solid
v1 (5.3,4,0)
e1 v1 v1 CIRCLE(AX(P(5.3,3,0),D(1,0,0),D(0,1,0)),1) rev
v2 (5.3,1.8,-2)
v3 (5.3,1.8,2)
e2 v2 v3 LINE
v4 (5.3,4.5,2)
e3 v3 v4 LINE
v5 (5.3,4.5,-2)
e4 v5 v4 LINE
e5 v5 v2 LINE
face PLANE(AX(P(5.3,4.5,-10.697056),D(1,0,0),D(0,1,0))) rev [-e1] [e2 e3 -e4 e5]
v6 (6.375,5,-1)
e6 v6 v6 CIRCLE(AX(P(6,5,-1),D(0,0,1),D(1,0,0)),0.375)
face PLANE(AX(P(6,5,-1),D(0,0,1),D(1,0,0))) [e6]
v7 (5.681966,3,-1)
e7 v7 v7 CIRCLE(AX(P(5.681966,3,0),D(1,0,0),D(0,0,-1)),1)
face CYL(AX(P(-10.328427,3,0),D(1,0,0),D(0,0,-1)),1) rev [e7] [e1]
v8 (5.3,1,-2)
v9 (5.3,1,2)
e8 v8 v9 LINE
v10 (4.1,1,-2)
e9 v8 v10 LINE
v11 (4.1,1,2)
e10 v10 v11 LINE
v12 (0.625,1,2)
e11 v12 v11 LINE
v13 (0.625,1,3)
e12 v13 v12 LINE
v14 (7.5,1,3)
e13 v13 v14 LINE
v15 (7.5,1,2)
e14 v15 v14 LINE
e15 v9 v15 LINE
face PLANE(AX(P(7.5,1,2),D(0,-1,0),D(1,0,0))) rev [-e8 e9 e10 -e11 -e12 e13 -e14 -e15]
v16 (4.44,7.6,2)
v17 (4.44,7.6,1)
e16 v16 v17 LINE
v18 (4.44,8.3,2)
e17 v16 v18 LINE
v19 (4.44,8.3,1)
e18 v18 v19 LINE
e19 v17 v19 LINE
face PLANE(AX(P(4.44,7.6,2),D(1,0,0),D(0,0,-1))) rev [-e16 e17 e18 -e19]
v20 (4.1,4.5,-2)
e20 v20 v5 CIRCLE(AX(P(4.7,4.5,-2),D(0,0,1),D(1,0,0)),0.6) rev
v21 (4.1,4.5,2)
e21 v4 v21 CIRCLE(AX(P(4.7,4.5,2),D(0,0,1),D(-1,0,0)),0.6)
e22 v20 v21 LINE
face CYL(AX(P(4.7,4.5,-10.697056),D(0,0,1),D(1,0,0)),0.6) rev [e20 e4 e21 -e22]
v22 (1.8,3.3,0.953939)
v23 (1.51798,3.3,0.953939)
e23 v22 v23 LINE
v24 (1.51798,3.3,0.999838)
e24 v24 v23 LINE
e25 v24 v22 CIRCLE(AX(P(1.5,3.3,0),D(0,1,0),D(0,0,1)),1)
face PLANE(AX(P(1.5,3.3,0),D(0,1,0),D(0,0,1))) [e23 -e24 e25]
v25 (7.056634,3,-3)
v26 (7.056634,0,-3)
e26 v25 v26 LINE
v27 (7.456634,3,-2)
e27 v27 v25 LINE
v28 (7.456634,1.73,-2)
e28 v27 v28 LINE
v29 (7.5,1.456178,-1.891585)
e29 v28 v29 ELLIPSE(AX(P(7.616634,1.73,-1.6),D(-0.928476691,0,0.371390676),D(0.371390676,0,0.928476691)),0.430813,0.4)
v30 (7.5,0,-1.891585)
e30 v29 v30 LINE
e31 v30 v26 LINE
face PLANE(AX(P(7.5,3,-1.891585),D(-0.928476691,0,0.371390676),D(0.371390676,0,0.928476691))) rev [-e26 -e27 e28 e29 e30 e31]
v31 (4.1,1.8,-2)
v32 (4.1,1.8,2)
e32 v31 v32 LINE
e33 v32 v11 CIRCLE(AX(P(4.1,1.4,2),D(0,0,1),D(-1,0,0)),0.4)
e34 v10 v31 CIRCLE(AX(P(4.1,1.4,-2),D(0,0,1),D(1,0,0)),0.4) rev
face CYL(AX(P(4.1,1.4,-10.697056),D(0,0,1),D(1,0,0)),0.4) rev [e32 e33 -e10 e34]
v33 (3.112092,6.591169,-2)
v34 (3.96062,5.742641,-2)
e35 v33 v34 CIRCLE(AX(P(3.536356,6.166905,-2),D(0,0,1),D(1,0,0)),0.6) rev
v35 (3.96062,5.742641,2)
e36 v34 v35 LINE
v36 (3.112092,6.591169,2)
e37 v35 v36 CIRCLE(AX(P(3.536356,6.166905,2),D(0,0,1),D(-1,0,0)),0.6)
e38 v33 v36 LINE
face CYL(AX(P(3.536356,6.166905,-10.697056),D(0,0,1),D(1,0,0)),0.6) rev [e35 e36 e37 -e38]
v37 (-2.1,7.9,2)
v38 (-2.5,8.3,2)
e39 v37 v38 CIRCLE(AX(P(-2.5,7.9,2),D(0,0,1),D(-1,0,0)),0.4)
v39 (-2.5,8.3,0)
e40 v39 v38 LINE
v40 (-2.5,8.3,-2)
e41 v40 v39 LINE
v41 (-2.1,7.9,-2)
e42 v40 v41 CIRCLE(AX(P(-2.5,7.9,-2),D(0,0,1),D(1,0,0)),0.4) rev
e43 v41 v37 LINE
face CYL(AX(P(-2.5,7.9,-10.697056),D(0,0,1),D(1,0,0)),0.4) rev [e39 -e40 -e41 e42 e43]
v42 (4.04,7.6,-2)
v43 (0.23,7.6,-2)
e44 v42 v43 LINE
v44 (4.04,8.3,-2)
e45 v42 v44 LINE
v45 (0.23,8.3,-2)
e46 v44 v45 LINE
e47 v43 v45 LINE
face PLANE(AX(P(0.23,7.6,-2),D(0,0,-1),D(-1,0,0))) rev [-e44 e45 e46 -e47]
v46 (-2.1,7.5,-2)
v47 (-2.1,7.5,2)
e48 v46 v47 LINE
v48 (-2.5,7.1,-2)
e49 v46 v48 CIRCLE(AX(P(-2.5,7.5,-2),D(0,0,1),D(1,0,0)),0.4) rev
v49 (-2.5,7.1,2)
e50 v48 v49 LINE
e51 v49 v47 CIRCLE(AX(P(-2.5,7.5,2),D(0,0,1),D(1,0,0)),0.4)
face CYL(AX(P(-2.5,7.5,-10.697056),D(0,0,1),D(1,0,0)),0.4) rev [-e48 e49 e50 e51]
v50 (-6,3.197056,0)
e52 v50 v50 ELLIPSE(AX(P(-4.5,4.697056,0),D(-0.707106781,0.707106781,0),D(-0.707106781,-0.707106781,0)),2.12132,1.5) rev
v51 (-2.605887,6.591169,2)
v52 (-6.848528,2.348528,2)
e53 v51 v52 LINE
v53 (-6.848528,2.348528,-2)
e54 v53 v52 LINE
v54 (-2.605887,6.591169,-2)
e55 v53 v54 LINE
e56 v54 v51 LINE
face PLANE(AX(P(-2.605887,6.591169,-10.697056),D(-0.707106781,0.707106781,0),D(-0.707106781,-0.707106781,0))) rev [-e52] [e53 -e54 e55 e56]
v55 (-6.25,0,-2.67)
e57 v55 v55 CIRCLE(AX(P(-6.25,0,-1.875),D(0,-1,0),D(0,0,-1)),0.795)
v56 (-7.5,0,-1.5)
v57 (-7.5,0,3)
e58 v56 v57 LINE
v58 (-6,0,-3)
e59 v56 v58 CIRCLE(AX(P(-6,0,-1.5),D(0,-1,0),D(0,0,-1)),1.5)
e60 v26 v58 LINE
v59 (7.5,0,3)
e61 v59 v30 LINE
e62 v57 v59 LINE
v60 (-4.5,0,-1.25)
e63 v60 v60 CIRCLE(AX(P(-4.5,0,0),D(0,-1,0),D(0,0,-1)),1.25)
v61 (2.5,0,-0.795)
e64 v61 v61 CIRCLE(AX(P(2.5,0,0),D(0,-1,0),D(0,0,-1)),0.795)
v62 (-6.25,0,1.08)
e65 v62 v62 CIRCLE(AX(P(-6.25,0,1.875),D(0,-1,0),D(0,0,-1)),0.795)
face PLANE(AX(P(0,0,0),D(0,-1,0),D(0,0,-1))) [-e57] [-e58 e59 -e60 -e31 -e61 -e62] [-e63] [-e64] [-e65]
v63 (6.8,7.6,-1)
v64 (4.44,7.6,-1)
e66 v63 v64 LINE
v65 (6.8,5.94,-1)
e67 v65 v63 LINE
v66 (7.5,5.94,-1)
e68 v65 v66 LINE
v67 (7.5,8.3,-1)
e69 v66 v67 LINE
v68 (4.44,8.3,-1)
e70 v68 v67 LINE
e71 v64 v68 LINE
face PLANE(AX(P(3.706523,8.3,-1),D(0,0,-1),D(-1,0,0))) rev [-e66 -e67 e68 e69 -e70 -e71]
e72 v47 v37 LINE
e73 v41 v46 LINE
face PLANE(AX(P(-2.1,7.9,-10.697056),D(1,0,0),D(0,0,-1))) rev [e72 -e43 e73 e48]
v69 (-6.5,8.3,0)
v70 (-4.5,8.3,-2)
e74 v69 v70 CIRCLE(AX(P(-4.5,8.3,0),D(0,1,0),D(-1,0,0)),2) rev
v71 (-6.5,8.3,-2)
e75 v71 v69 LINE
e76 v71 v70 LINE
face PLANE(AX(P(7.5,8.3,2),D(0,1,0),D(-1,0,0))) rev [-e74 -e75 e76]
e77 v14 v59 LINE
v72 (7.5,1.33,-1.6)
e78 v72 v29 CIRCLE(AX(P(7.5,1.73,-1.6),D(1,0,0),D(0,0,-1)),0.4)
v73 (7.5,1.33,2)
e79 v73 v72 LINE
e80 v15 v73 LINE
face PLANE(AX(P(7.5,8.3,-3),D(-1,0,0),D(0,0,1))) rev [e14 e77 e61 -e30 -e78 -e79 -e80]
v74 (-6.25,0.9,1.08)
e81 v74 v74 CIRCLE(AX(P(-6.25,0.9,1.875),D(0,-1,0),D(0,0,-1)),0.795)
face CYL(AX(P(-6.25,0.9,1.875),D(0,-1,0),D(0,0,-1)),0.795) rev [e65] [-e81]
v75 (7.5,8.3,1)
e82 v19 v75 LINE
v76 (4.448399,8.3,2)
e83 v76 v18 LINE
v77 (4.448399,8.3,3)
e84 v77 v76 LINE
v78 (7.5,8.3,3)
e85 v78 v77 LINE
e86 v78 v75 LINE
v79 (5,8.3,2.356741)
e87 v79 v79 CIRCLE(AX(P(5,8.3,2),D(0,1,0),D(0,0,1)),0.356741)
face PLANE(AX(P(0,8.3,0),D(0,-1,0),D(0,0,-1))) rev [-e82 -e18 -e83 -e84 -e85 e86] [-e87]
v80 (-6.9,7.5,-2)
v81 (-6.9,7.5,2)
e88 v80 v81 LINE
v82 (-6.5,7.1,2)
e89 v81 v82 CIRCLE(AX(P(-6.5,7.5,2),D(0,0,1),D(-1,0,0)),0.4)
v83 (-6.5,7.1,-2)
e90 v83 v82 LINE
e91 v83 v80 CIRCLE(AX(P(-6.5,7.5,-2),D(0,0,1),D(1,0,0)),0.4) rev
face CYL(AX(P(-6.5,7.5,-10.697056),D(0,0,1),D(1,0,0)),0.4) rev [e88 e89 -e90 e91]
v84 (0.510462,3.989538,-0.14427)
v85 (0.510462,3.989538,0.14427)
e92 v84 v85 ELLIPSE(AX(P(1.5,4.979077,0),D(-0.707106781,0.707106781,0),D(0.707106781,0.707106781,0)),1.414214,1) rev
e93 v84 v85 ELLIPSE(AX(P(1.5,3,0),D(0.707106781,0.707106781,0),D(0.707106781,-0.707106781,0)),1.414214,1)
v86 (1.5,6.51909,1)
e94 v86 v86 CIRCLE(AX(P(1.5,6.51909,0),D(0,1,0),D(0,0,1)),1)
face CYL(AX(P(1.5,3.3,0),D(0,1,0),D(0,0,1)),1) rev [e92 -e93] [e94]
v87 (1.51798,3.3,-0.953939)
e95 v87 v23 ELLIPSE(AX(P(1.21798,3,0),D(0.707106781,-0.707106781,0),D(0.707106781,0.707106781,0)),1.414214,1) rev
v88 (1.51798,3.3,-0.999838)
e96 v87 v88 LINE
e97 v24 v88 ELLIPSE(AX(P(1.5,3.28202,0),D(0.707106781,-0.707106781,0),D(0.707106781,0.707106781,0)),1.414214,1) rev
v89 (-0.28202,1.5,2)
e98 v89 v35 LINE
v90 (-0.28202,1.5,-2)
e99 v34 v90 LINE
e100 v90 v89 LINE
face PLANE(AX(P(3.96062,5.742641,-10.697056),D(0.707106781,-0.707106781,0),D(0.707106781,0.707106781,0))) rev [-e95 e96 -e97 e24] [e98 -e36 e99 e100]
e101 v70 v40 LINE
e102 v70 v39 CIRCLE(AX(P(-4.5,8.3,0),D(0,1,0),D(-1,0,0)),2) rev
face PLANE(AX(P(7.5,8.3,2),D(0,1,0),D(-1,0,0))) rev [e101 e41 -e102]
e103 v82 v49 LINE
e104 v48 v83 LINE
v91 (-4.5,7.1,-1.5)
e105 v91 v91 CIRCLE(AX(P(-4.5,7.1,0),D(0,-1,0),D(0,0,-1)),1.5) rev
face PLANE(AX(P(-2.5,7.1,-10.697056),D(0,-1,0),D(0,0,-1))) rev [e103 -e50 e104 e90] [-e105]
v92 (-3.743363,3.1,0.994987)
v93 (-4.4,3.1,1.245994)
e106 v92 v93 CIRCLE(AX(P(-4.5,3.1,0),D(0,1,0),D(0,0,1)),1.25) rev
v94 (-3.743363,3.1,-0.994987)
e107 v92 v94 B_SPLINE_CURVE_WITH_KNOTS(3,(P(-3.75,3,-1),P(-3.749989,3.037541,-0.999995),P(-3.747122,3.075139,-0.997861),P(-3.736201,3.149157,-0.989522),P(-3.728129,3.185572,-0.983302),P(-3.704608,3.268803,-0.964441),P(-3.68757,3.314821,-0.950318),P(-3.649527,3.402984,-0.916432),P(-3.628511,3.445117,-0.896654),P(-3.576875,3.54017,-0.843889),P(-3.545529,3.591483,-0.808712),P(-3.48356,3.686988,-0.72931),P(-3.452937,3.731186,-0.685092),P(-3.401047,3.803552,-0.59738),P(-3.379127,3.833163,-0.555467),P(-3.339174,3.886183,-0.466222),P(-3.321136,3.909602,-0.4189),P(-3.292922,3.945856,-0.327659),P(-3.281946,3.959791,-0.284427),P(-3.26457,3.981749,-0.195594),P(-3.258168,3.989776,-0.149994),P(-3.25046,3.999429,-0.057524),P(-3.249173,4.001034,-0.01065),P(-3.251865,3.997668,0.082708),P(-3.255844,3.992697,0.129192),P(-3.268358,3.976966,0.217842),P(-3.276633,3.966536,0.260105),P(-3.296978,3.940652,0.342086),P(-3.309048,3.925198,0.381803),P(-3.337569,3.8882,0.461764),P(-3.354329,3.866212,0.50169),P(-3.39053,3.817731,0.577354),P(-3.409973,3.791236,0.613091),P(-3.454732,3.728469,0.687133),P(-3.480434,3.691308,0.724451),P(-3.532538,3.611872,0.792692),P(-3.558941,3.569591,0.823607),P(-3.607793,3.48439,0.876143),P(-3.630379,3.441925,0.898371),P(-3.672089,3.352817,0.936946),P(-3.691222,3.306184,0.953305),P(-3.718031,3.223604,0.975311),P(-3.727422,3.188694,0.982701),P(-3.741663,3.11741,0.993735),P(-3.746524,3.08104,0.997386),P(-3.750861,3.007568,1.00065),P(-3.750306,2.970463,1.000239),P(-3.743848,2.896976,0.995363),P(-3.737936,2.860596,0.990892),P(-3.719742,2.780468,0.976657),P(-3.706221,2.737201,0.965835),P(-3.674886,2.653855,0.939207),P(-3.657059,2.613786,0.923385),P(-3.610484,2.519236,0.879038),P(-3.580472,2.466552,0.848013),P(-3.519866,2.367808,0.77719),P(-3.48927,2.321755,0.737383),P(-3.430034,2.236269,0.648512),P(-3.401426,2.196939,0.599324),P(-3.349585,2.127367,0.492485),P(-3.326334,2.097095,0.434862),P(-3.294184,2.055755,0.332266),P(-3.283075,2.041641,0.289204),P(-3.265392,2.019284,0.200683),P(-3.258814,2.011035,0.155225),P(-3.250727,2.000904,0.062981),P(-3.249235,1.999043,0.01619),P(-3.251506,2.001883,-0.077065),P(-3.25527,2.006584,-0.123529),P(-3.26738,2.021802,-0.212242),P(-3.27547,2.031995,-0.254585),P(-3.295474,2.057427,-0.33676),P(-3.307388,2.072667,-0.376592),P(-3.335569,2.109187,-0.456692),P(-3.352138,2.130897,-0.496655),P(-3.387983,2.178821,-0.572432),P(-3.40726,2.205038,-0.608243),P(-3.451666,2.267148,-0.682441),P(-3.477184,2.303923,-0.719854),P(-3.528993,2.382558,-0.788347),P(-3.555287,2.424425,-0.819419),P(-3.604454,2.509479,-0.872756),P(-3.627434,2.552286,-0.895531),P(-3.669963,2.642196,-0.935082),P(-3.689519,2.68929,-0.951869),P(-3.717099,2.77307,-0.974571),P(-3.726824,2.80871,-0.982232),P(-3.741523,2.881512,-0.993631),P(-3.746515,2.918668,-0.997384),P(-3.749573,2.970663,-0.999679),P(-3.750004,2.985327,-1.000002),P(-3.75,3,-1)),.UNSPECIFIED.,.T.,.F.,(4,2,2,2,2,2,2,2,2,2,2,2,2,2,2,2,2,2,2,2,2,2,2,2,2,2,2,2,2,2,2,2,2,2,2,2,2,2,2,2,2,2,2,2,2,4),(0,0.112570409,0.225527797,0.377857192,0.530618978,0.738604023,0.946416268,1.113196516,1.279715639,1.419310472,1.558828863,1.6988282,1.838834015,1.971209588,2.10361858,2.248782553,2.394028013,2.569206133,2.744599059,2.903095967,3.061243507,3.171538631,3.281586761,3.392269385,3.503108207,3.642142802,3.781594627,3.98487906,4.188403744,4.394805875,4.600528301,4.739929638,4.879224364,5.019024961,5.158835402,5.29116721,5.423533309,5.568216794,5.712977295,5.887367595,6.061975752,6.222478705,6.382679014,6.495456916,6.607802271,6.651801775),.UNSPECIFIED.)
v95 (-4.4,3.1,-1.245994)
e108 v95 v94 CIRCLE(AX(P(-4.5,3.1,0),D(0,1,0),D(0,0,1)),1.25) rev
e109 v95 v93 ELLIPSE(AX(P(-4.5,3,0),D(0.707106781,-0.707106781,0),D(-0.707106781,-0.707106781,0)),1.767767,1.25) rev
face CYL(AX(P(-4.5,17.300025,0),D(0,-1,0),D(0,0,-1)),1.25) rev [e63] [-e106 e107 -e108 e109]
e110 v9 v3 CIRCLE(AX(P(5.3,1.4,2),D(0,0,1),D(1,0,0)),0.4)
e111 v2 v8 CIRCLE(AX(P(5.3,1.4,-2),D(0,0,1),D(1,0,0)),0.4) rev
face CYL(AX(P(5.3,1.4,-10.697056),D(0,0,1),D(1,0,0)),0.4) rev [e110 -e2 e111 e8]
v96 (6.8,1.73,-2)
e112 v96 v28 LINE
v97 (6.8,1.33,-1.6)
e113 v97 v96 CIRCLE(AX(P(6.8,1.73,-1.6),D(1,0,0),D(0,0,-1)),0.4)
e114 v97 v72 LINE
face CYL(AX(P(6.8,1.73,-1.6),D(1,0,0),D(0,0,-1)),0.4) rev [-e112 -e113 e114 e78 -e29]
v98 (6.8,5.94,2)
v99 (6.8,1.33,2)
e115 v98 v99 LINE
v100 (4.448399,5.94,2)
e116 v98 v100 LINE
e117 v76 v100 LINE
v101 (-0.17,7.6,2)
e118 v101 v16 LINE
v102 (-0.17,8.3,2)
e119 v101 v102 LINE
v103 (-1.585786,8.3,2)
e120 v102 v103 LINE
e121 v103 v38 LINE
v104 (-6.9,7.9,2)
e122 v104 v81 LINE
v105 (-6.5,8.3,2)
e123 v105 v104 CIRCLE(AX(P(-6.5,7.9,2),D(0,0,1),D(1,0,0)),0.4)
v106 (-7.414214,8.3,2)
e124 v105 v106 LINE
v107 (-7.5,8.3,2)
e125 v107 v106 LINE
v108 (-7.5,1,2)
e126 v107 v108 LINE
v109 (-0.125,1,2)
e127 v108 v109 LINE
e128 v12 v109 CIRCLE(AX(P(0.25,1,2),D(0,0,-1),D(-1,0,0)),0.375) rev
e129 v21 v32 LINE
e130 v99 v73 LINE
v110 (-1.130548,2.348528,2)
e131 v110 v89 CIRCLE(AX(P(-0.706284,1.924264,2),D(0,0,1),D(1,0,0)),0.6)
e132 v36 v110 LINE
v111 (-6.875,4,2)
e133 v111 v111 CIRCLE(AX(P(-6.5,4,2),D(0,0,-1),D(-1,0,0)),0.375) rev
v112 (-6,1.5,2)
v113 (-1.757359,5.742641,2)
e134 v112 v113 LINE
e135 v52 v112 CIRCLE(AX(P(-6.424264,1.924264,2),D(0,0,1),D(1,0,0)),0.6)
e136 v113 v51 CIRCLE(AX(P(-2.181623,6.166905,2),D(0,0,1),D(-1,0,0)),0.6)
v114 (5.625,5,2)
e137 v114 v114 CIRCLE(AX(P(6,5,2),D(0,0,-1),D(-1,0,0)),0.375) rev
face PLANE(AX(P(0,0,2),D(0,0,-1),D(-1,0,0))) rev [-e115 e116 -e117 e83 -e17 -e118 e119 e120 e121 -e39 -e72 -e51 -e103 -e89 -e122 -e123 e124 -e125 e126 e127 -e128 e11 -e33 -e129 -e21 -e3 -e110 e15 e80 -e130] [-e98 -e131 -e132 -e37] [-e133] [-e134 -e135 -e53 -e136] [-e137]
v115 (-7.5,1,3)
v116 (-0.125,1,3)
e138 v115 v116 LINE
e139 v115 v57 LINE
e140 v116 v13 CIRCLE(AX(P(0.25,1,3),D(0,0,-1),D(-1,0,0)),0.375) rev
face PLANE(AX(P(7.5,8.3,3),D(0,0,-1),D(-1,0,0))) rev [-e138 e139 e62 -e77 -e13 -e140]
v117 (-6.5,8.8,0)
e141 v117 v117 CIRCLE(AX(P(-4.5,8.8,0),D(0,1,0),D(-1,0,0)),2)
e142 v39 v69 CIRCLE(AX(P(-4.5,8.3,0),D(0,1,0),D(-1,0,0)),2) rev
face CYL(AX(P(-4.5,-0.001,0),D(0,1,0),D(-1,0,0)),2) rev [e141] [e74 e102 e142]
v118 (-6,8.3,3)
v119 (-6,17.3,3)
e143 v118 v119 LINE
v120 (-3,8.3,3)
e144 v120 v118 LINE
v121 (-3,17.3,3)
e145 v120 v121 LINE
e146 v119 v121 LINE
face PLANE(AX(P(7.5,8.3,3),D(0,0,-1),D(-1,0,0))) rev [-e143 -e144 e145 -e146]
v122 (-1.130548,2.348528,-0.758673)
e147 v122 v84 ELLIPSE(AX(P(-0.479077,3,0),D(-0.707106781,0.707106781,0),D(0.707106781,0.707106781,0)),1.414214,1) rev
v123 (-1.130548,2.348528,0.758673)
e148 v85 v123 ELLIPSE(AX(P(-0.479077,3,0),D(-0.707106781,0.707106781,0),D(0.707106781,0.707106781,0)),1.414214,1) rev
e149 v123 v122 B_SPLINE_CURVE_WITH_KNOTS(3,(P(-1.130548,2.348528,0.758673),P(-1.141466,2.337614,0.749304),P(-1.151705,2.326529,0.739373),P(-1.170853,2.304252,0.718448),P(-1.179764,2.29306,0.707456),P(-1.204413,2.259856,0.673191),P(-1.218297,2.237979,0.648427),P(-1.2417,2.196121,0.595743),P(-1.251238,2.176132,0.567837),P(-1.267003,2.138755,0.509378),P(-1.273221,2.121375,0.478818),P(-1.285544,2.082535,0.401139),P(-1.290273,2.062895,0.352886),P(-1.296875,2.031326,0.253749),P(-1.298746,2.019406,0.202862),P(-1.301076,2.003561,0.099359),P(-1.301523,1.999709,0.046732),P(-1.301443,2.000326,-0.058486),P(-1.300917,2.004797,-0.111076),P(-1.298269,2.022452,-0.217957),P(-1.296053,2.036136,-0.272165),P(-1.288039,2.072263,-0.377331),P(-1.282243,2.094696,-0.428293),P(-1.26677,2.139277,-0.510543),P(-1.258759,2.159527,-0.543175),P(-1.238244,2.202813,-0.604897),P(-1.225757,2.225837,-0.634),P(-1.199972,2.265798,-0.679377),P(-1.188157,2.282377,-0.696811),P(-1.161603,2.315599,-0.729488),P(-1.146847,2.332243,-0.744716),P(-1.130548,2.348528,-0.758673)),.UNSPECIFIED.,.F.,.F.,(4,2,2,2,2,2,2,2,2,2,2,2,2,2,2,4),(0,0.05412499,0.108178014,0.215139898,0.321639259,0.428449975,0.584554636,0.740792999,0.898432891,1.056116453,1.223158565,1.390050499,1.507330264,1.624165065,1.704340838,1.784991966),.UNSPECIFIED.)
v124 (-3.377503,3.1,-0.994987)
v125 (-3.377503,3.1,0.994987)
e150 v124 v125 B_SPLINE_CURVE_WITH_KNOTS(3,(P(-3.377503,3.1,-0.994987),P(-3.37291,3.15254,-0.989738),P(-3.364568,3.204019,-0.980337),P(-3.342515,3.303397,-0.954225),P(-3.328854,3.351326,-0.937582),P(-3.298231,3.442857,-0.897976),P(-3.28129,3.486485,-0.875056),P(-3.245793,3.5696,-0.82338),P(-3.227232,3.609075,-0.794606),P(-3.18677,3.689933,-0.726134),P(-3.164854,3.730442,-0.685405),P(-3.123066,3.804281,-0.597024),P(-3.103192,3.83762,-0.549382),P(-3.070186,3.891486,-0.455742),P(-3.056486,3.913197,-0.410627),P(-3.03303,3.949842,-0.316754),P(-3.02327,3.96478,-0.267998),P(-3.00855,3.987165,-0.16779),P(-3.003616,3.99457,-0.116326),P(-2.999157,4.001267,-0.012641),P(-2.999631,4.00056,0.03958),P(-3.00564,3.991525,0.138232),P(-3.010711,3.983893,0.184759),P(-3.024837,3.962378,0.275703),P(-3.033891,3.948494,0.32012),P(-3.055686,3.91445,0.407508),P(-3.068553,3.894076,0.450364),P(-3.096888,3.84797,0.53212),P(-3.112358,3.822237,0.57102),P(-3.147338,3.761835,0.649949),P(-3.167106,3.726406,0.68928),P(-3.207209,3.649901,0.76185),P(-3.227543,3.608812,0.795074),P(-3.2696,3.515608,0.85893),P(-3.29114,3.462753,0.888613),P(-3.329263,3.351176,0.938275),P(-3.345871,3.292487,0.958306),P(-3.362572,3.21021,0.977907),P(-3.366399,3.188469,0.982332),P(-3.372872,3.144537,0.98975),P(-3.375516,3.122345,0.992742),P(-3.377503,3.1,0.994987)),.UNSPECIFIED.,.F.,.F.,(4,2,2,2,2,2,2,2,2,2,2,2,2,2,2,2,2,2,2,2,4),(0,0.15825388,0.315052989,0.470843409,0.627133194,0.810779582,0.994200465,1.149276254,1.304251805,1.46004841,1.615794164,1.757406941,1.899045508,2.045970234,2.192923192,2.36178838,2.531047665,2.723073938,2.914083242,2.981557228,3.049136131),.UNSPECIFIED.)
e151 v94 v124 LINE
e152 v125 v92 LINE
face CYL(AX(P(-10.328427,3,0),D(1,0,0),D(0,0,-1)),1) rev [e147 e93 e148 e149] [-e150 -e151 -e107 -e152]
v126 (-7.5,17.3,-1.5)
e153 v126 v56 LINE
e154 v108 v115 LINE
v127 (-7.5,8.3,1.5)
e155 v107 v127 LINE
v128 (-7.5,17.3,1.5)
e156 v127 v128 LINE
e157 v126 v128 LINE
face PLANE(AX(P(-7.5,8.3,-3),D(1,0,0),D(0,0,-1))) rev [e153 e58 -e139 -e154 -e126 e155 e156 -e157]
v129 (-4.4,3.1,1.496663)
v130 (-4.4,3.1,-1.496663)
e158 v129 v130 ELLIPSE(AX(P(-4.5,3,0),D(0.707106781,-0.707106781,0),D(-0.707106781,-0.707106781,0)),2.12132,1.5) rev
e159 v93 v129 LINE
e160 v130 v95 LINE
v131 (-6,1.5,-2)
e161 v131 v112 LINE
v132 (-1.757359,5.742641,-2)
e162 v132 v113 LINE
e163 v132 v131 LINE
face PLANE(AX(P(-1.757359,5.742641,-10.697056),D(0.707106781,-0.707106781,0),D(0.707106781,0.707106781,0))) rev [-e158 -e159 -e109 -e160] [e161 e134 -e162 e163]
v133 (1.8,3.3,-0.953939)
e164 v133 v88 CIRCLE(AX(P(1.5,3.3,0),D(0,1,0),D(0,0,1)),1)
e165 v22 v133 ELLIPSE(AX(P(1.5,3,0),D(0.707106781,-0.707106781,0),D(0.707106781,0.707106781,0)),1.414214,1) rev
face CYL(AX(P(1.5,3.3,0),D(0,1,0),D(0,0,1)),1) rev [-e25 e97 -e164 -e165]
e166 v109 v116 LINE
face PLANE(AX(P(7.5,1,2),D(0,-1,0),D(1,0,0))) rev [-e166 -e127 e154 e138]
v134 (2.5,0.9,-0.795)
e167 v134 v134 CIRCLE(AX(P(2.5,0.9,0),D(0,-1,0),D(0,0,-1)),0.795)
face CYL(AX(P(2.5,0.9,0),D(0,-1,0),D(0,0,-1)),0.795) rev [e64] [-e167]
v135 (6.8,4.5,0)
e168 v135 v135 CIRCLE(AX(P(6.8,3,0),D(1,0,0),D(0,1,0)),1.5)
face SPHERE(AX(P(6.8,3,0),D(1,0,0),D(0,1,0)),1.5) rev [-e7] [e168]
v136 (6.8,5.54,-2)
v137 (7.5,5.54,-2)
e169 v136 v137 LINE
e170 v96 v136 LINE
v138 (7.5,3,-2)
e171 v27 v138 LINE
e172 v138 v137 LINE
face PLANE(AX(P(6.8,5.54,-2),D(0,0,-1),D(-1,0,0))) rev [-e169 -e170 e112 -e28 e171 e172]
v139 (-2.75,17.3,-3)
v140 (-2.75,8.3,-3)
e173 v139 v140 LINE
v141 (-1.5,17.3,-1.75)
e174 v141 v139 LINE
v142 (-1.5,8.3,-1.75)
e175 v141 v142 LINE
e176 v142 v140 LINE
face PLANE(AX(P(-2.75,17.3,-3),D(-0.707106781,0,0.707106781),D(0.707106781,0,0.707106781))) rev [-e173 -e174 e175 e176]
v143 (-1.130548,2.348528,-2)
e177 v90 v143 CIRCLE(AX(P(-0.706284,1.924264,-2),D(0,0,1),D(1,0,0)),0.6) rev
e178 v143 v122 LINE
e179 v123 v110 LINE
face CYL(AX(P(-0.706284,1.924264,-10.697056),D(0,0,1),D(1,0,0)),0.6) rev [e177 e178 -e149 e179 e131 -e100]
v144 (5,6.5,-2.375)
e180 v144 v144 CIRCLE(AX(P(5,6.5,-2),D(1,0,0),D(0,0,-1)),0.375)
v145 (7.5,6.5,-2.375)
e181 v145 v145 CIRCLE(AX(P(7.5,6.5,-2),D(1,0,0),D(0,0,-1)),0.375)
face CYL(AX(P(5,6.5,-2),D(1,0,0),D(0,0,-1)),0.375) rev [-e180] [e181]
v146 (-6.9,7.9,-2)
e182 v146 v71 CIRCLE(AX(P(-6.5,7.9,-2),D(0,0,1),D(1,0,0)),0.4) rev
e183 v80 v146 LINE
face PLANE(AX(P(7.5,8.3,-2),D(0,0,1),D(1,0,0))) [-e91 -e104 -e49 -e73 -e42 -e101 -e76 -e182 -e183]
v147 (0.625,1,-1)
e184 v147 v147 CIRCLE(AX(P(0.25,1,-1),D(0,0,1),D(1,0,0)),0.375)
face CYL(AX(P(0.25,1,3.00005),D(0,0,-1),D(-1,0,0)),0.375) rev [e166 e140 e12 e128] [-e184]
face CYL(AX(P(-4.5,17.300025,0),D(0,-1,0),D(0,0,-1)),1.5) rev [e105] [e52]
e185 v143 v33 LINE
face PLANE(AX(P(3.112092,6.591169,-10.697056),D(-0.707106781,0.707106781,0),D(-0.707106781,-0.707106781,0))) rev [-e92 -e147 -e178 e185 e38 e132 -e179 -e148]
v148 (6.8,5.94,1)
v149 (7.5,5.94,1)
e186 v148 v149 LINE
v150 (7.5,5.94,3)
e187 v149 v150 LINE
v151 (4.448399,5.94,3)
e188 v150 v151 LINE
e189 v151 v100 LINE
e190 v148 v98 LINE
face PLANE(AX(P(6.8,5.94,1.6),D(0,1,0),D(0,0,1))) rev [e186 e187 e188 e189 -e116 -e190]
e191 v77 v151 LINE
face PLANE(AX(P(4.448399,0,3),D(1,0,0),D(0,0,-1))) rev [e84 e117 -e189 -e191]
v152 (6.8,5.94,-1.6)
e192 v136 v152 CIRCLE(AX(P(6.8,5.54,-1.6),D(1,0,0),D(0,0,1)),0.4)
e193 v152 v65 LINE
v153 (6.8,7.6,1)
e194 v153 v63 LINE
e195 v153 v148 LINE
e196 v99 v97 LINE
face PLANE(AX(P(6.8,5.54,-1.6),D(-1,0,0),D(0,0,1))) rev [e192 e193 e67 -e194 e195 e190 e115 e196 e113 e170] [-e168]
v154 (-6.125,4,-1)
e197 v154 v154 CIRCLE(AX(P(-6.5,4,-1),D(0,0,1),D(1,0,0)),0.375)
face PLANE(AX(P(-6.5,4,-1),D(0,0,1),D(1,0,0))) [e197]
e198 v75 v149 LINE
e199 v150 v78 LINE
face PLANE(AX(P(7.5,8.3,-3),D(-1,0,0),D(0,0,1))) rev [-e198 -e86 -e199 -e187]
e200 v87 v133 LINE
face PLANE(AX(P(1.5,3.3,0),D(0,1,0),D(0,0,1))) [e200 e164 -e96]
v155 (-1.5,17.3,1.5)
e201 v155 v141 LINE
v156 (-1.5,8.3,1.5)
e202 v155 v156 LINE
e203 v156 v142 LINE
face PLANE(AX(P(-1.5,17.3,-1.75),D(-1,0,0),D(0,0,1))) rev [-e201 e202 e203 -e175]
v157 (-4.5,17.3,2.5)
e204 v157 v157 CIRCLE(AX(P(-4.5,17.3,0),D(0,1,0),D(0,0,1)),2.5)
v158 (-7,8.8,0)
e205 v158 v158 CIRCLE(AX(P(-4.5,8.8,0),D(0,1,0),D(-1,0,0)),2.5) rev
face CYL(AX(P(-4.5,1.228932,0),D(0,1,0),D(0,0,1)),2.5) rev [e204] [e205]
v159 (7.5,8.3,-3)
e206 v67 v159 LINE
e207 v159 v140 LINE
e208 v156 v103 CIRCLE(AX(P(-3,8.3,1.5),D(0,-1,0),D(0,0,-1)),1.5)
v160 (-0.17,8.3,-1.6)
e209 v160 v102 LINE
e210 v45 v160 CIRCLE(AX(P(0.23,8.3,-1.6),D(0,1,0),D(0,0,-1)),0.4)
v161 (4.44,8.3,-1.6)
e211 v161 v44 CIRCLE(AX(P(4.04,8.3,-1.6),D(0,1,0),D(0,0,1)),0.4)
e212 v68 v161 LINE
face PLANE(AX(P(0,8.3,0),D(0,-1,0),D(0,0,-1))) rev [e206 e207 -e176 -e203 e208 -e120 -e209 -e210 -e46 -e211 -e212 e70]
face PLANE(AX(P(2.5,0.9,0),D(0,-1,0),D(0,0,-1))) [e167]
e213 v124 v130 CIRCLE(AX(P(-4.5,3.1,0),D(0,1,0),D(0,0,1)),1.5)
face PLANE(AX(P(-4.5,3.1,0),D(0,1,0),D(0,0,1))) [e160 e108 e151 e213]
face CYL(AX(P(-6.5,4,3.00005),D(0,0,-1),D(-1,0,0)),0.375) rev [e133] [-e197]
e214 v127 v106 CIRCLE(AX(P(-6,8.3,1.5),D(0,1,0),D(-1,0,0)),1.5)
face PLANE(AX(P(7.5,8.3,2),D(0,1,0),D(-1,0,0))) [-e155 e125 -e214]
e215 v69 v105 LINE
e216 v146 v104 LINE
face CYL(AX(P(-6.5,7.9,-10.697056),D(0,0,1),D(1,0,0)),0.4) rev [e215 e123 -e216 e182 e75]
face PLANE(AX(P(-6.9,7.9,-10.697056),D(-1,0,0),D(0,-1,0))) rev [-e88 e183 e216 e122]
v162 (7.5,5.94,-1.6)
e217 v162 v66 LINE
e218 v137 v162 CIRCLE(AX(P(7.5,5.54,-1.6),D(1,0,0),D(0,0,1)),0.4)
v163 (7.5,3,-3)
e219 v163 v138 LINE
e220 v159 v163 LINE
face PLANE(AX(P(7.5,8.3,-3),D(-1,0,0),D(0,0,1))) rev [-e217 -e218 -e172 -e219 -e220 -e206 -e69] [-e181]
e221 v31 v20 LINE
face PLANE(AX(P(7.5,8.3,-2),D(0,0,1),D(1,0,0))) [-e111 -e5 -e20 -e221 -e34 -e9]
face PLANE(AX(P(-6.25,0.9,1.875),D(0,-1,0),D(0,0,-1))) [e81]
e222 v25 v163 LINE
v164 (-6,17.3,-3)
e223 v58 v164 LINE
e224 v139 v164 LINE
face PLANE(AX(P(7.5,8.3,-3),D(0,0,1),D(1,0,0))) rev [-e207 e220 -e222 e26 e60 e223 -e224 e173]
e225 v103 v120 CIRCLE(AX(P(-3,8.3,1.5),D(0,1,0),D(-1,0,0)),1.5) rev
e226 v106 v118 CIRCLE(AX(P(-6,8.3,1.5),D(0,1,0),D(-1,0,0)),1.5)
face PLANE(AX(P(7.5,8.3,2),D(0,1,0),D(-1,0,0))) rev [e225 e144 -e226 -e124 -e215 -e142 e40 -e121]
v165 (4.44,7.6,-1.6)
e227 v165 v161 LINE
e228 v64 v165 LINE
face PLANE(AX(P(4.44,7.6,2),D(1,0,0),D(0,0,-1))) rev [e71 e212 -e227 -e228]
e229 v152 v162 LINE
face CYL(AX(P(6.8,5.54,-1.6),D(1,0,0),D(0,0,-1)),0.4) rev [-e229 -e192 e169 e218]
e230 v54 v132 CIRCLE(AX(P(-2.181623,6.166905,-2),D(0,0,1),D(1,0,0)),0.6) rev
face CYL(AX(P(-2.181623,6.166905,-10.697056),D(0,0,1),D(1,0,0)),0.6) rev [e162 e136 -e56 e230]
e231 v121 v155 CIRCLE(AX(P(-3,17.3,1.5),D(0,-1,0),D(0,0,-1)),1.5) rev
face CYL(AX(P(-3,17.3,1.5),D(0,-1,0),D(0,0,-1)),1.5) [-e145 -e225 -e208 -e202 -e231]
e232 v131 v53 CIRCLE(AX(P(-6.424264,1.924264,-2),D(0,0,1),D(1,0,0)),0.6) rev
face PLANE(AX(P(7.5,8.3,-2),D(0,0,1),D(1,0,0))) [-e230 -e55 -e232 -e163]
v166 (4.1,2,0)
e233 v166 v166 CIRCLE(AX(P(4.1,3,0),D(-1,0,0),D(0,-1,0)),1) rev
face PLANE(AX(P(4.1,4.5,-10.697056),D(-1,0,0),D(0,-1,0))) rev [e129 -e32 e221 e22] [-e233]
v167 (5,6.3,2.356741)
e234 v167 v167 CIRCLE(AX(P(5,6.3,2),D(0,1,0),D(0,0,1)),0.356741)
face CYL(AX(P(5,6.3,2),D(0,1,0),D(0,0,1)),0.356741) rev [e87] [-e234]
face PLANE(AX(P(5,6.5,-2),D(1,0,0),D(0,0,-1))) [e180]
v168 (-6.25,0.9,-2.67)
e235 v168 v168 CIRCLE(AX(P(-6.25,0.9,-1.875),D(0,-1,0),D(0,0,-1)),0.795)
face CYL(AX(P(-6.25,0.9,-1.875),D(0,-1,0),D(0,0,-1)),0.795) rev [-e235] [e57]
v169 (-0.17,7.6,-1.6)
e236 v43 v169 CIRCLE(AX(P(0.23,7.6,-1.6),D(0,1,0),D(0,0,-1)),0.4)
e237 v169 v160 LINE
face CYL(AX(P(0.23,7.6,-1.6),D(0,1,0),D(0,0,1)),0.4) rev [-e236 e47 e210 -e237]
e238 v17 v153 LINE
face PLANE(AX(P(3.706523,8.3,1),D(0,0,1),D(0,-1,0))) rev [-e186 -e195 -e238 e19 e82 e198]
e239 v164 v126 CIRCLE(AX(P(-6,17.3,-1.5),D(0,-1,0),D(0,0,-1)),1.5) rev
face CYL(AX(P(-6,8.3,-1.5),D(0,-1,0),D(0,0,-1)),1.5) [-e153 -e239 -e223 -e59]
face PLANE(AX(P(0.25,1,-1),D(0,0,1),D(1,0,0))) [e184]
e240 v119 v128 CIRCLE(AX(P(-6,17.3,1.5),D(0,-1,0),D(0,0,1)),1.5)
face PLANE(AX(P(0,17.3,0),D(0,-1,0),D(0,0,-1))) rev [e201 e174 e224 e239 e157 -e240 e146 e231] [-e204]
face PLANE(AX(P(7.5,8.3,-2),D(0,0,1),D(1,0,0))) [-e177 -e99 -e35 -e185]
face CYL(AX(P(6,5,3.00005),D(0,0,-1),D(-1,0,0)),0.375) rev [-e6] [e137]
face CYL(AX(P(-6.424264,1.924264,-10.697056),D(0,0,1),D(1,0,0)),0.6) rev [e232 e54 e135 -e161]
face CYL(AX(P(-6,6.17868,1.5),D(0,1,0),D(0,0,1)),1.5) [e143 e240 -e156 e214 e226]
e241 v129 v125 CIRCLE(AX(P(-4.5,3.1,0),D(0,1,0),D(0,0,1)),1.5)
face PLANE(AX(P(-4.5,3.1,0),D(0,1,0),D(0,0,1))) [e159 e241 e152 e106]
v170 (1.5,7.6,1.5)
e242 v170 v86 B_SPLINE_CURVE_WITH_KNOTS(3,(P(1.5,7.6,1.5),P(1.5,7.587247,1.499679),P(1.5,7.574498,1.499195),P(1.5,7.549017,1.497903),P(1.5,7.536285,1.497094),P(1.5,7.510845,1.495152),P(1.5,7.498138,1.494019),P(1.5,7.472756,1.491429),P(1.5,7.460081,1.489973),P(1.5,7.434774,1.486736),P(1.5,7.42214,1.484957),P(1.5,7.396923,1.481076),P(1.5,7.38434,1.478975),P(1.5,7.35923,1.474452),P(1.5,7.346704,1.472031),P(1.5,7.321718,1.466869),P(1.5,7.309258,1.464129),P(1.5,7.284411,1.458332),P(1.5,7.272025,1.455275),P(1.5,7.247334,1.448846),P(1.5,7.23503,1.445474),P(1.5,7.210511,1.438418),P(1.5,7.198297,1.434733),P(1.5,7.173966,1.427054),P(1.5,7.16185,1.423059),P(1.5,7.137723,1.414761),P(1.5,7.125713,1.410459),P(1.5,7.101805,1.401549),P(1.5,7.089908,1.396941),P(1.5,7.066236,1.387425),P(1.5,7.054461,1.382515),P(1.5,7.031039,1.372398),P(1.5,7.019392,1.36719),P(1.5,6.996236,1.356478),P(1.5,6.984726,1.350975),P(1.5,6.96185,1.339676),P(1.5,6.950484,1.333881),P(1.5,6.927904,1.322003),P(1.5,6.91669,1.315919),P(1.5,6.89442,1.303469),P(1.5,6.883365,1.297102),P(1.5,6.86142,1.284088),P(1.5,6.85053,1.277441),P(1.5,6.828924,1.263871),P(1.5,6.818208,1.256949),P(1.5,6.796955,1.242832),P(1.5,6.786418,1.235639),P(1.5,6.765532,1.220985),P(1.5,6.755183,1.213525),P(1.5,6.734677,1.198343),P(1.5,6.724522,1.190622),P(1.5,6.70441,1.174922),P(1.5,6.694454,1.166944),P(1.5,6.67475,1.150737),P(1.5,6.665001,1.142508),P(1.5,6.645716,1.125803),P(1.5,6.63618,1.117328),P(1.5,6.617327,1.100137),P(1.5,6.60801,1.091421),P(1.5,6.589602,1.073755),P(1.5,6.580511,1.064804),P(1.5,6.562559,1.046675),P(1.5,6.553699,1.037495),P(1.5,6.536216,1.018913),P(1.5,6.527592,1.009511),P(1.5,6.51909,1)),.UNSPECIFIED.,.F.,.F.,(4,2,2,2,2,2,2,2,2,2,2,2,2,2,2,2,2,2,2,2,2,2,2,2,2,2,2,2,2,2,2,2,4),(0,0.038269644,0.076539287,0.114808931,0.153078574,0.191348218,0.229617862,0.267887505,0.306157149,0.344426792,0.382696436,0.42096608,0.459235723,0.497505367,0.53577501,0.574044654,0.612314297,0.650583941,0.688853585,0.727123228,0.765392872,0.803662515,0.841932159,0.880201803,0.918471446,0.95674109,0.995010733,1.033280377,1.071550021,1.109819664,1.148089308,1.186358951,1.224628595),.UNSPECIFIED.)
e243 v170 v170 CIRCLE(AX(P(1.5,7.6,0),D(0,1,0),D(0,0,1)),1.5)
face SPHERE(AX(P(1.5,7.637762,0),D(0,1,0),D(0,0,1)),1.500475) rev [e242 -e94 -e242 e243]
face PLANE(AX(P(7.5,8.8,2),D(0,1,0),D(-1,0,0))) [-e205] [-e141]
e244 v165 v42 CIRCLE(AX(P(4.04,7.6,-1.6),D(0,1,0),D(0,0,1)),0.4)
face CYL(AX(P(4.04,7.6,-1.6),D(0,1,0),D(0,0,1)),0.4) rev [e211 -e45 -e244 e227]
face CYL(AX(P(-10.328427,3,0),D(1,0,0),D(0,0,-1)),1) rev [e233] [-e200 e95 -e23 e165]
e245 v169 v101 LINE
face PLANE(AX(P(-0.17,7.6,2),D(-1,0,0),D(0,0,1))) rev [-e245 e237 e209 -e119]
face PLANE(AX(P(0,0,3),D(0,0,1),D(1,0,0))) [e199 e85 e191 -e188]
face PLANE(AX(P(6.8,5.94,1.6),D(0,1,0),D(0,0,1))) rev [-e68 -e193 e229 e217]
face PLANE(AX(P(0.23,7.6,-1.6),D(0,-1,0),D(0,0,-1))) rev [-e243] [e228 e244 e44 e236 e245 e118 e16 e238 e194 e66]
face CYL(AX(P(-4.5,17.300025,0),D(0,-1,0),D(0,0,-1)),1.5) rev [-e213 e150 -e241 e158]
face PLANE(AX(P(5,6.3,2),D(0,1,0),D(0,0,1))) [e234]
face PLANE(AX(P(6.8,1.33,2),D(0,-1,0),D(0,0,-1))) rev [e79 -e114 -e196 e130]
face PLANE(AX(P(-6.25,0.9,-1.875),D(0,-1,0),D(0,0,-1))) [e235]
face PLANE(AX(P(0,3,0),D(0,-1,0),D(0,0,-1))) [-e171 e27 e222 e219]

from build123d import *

# Parameters (mm, degrees)
SKETCH1_W                        = 15
SKETCH1_H                        = 6
MAIN_BODY_EXT_DEPTH              = 8.3
EMISSION_PATH_EXT_DEPTH          = 9
SKETCH3_R                        = 1.25
EMISSION_AND_GRIN_CUT_DEPTH      = 20.092931
SKETCH4_R                        = 1
DRUM_LENS_CUT_DEPTH              = 13
SKETCH41_R                       = 1
ADDTL_LIGHT_SOURCE_DEPTH         = 5
SKETCH5_W                        = 15
SKETCH5_H                        = 7.3
FILTERSET_CUT1_DEPTH             = 1
FILTERSET_CUT2_DEPTH             = 4
SKETCH10_R                       = 2.5
EMISSION_LENS_CUT_DEPTH          = 8.5
SKETCH15_R                       = 0.795
MAGNETS_CUT_DEPTH                = 0.9
SCREW_HOLES_CUT_DEPTH            = 20.507434
SCREW_HOLES_CUT_DEPTH_BACK       = 3
SKETCH18_R                       = 0.375
EXTERNAL_FILLET_1_R              = 1.5
CUT_EXTRUDE8_DEPTH               = 14.011149
CUT_EXTRUDE8_DEPTH_BACK          = 4
SKETCH28_R                       = 1.5
CUT_EXTRUDE9_DEPTH               = 3
CUT_EXTRUDE_ORIGINAL_LIGHT_DEPTH = 0.7
CUT_EXTRUDE_ADDTL_LIGHT_DEPTH    = 0.7
SKETCH29_R                       = 0.375
CUT_EXTRUDE11_DEPTH              = 2.5
SKETCH32_W                       = 2
SKETCH32_H                       = 2.36
CUT_EXTRUDE14_DEPTH              = 0.7
SKETCH45_W                       = 2.36
SKETCH45_H                       = 2
CUT_EXTRUDE19_DEPTH              = 0.7
CUT_EXTRUDE16_DEPTH              = 9
CUT_EXTRUDE17_REACH              = 13.945
SKETCH37_R                       = 2
BOSS_EXTRUDE2_DEPTH              = 1
SKETCH51_R                       = 0.356741
ADD_L_SCREW_HOLE_DEPTH           = 2


with BuildPart() as part:
    # Sketch1 → Main Body Ext (new body)
    with BuildSketch(Plane(origin=(0, 0, 0), x_dir=(1, 0, 0), z_dir=(0, 1, 0))):
        Rectangle(SKETCH1_W, SKETCH1_H)
    extrude(amount=MAIN_BODY_EXT_DEPTH)

    # Sketch8 → Emission Path Ext (add)
    with BuildSketch(Plane(origin=(0, 8.3, 0), x_dir=(1, 0, 0), z_dir=(0, 1, 0))):
        Polygon((-2.75, 3), (-1.5, 1.75), (-1.5, -3), (-7.5, -3), (-7.5, 3), align=None)
    extrude(amount=EMISSION_PATH_EXT_DEPTH)

    # Sketch3 → Emission and Grin Cut (cut, through all)
    with BuildSketch(Plane.XZ):
        with Locations(Location((-4.5, 0, 0), (0, 0, 270))):
            Circle(SKETCH3_R)
    extrude(amount=-EMISSION_AND_GRIN_CUT_DEPTH, mode=Mode.SUBTRACT)

    # Sketch4 → Drum Lens Cut (cut)
    with BuildSketch(Plane(origin=(7.5, 0, 0), x_dir=(0, 0, -1), z_dir=(1, 0, 0))):
        with Locations((0, 3)):
            Circle(SKETCH4_R)
    extrude(amount=-DRUM_LENS_CUT_DEPTH, mode=Mode.SUBTRACT)

    # Sketch41 → Addtl Light Source (cut)
    with BuildSketch(Plane(origin=(0, 8.3, 0), x_dir=(1, 0, 0), z_dir=(0, 1, 0))):
        with Locations(Location((1.5, 0, 0), (0, 0, 270))):
            Circle(SKETCH41_R)
    extrude(amount=-ADDTL_LIGHT_SOURCE_DEPTH, mode=Mode.SUBTRACT)

    # Sketch5 → FilterSet Cut1 (cut)
    with BuildSketch(Plane.XY.offset(3)):
        with Locations((0, 4.65)):
            Rectangle(SKETCH5_W, SKETCH5_H)
    extrude(amount=-FILTERSET_CUT1_DEPTH, mode=Mode.SUBTRACT)

    # Sketch6 → FilterSet Cut2 (cut)
    with BuildSketch(Plane.XY.offset(2)):
        with BuildLine():
            Line((5.3, 4.5), (5.3, 1.8))
            ThreePointArc((5.3, 1.8), (5.7, 1.4), (5.3, 1))
            Line((5.3, 1), (4.1, 1))
            ThreePointArc((4.1, 1), (3.7, 1.4), (4.1, 1.8))
            Line((4.1, 1.8), (4.1, 4.5))
            ThreePointArc((4.1, 4.5), (4.7, 5.1), (5.3, 4.5))
        make_face()
        with BuildLine():
            Line((-6.9, 7.9), (-6.9, 7.5))
            ThreePointArc((-6.9, 7.5), (-6.782843, 7.217157), (-6.5, 7.1))
            Line((-6.5, 7.1), (-2.5, 7.1))
            ThreePointArc((-2.5, 7.1), (-2.217157, 7.217157), (-2.1, 7.5))
            Line((-2.1, 7.5), (-2.1, 7.9))
            ThreePointArc((-2.1, 7.9), (-2.217157, 8.182843), (-2.5, 8.3))
            Line((-2.5, 8.3), (-6.5, 8.3))
            ThreePointArc((-6.5, 8.3), (-6.782843, 8.182843), (-6.9, 7.9))
        make_face()
        with BuildLine():
            Line((-2.605887, 6.591169), (-6.848528, 2.348528))
            ThreePointArc((-6.848528, 2.348528), (-6.848528, 1.5), (-6, 1.5))
            Line((-6, 1.5), (-1.757359, 5.742641))
            ThreePointArc((-1.757359, 5.742641), (-1.757359, 6.591169), (-2.605887, 6.591169))
        make_face()
        with BuildLine():
            Line((3.112092, 6.591169), (-1.130548, 2.348528))
            ThreePointArc((-1.130548, 2.348528), (-1.130548, 1.5), (-0.28202, 1.5))
            Line((-0.28202, 1.5), (3.96062, 5.742641))
            ThreePointArc((3.96062, 5.742641), (3.96062, 6.591169), (3.112092, 6.591169))
        make_face()
    extrude(amount=-FILTERSET_CUT2_DEPTH, mode=Mode.SUBTRACT)

    # Sketch10 → Emission Lens Cut (cut)
    with BuildSketch(Plane(origin=(0, 17.3, 0), x_dir=(1, 0, 0), z_dir=(0, 1, 0))):
        with Locations(Location((-4.5, 0, 0), (0, 0, 270))):
            Circle(SKETCH10_R)
    extrude(amount=-EMISSION_LENS_CUT_DEPTH, mode=Mode.SUBTRACT)

    # Sketch15 → Magnets Cut (cut)
    with BuildSketch(Plane.XZ):
        with Locations(Location((-6.25, -1.875, 0), (0, 0, 270))):
            Circle(SKETCH15_R)
        with Locations(Location((-6.25, 1.875, 0), (0, 0, 270))):
            Circle(SKETCH15_R)
        with Locations(Location((2.5, 0, 0), (0, 0, 270))):
            Circle(SKETCH15_R)
    extrude(amount=-MAGNETS_CUT_DEPTH, mode=Mode.SUBTRACT)

    # Sketch18 → Screw Holes Cut (cut, two sides: drawn at the far end of the back side and taken through both)
    with BuildSketch(Plane.XY.offset(2).offset(-SCREW_HOLES_CUT_DEPTH_BACK)):
        with Locations(Location((-6.5, 4, 0), (0, 0, 180))):
            Circle(SKETCH18_R)
        with Locations(Location((6, 5, 0), (0, 0, 180))):
            Circle(SKETCH18_R)
        with Locations((0.25, 1)):
            Circle(SKETCH18_R)
    extrude(amount=SCREW_HOLES_CUT_DEPTH + SCREW_HOLES_CUT_DEPTH_BACK, mode=Mode.SUBTRACT)

    # External Fillet 1
    # the kernel refuses this fillet: 1.5 mm, written as the material it takes off along each edge
    with BuildSketch(Plane(origin=(-7.5, -3.75, -3), x_dir=(1, 0, 0), z_dir=(0, 1, 0))) as external_fillet_1_piece_1:
        with BuildLine():
            CenterArc((EXTERNAL_FILLET_1_R, -EXTERNAL_FILLET_1_R), EXTERNAL_FILLET_1_R, 90, 90)
            Line((0, -EXTERNAL_FILLET_1_R), (0, 0))
            Line((0, 0), (EXTERNAL_FILLET_1_R, 0))
        make_face()
    extrude(amount=24.8, mode=Mode.SUBTRACT)
    with BuildSketch(Plane(origin=(-1.5, 8.3, 3), x_dir=(0, 0, -1), z_dir=(0, 1, 0))) as external_fillet_1_piece_2:
        with BuildLine():
            CenterArc((EXTERNAL_FILLET_1_R, EXTERNAL_FILLET_1_R), EXTERNAL_FILLET_1_R, 180, 90)
            Line((0, EXTERNAL_FILLET_1_R), (0, 0))
            Line((0, 0), (EXTERNAL_FILLET_1_R, 0))
        make_face()
    extrude(amount=12.75, mode=Mode.SUBTRACT)

    # Sketch28 → Cut-Extrude8 (cut, two sides: drawn at the far end of the back side and taken through both)
    with BuildSketch(Plane(origin=(0, 7.1, 0), x_dir=(1, 0, 0), z_dir=(0, 1, 0)).offset(-CUT_EXTRUDE8_DEPTH_BACK)):
        with Locations(Location((-4.5, 0, 0), (0, 0, 180))):
            Circle(SKETCH28_R)
    extrude(amount=CUT_EXTRUDE8_DEPTH + CUT_EXTRUDE8_DEPTH_BACK, mode=Mode.SUBTRACT)

    # Sketch14 → Cut-Extrude9 (cut)
    with BuildSketch(Plane.XZ):
        Polygon((7.5, -3), (7.5, -1.891585), (7.056634, -3), align=None)
    extrude(amount=-CUT_EXTRUDE9_DEPTH, mode=Mode.SUBTRACT)

    # Sketch12 → Cut-Extrude Original Light (cut)
    with BuildSketch(Plane(origin=(7.5, 0, 0), x_dir=(0, 0, -1), z_dir=(1, 0, 0))):
        with BuildLine():
            Line((1.6, 5.94), (-1.6, 5.94))
            Line((-1.6, 5.94), (-2, 5.94))
            Line((-2, 5.94), (-2, 1.33))
            Line((-2, 1.33), (1.6, 1.33))
            ThreePointArc((1.6, 1.33), (1.882843, 1.447157), (2, 1.73))
            Line((2, 1.73), (2, 5.54))
            ThreePointArc((2, 5.54), (1.882843, 5.822843), (1.6, 5.94))
        make_face()
    extrude(amount=-CUT_EXTRUDE_ORIGINAL_LIGHT_DEPTH, mode=Mode.SUBTRACT)

    # Sketch44 → Cut-Extrude Addtl Light (cut)
    with BuildSketch(Plane(origin=(0, 8.3, 0), x_dir=(1, 0, 0), z_dir=(0, 1, 0))):
        with BuildLine():
            Line((-0.17, -2), (4.44, -2))
            Line((4.44, -2), (4.44, 1.6))
            ThreePointArc((4.44, 1.6), (4.322843, 1.882843), (4.04, 2))
            Line((4.04, 2), (0.23, 2))
            ThreePointArc((0.23, 2), (-0.052843, 1.882843), (-0.17, 1.6))
            Line((-0.17, 1.6), (-0.17, -2))
        make_face()
    extrude(amount=-CUT_EXTRUDE_ADDTL_LIGHT_DEPTH, mode=Mode.SUBTRACT)

    # Sketch29 → Cut-Extrude11 (cut)
    with BuildSketch(Plane(origin=(7.5, 0, 0), x_dir=(0, 0, -1), z_dir=(1, 0, 0))):
        with Locations((2, 6.5)):
            Circle(SKETCH29_R)
    extrude(amount=-CUT_EXTRUDE11_DEPTH, mode=Mode.SUBTRACT)

    # Sketch32 → Cut-Extrude14 (cut)
    with BuildSketch(Plane(origin=(7.5, 0, 0), x_dir=(0, 0, -1), z_dir=(1, 0, 0))):
        with Locations((0, 7.12)):
            Rectangle(SKETCH32_W, SKETCH32_H)
    extrude(amount=-CUT_EXTRUDE14_DEPTH, mode=Mode.SUBTRACT)

    # Sketch45 → Cut-Extrude19 (cut)
    with BuildSketch(Plane(origin=(0, 8.3, 0), x_dir=(1, 0, 0), z_dir=(0, 1, 0))):
        with Locations((5.62, 0)):
            Rectangle(SKETCH45_W, SKETCH45_H)
    extrude(amount=-CUT_EXTRUDE19_DEPTH, mode=Mode.SUBTRACT)

    # Sketch33 → Cut-Revolve1 (revolve, cut)
    with BuildSketch(Plane.XY, mode=Mode.PRIVATE) as cut_revolve1_sk:
        with BuildLine():
            Line((6.8, 3), (5.3, 3))
            ThreePointArc((5.3, 3), (5.73934, 4.06066), (6.8, 4.5))
            Line((6.8, 4.5), (6.8, 3))
        make_face()
    revolve(cut_revolve1_sk.sketch.rotate(Axis((6.8, 3, 0), (-1, 0, 0)), 84.26086), axis=Axis((6.8, 3, 0), (-1, 0, 0)), mode=Mode.SUBTRACT)

    # Sketch47 → Cut-Revolve2 (revolve, cut)
    with BuildSketch(Plane(origin=(1.5, 0, 0), x_dir=(0, 0, -1), z_dir=(1, 0, 0))):
        with BuildLine():
            Line((-1.5, 7.6), (0, 7.6))
            Line((0, 7.6), (0, 6.137287))
            ThreePointArc((0, 6.137287), (-1.04756, 6.563498), (-1.5, 7.6))
        make_face()
    revolve(axis=Axis((1.5, 7.6, 0), (0, -1, 0)), mode=Mode.SUBTRACT)

    # Sketch36 → Cut-Extrude16 (cut)
    with BuildSketch(Plane(origin=(0, 17.3, 0), x_dir=(1, 0, 0), z_dir=(0, 1, 0))):
        with BuildLine():
            Line((-7.5, -1.5), (-7.5, -3))
            Line((-7.5, -3), (-6, -3))
            ThreePointArc((-6, -3), (-7.06066, -2.56066), (-7.5, -1.5))
        make_face()
    extrude(amount=-CUT_EXTRUDE16_DEPTH, mode=Mode.SUBTRACT)

    # Sketch37 → Cut-Extrude17 (cut, up to next)
    with BuildSketch(Plane(origin=(0, 8.8, 0), x_dir=(1, 0, 0), z_dir=(0, 1, 0)), mode=Mode.PRIVATE) as cut_extrude17_sk1:
        with Locations(Location((-4.5, 0, 0), (0, 0, 180))):
            Circle(SKETCH37_R)
    cut_extrude17_tool1 = extrude(cut_extrude17_sk1.sketch, amount=-CUT_EXTRUDE17_REACH, mode=Mode.PRIVATE) & part.part
    add(cut_extrude17_tool1.solids().sort_by_distance((-4.5, 8.8, 0))[0], mode=Mode.SUBTRACT)

    # Sketch49 → Boss-Extrude2 (add)
    with BuildSketch(Plane.XY.offset(2)):
        Polygon((7.5, 5.94), (7.5, 8.3), (4.448399, 8.3), (4.448399, 5.94), (7.025856, 5.94), (7.026388, 5.94), align=None)
    extrude(amount=BOSS_EXTRUDE2_DEPTH)

    # Sketch51 → Add'l Screw Hole (cut)
    with BuildSketch(Plane(origin=(0, 8.3, 0), x_dir=(1, 0, 0), z_dir=(0, 1, 0))):
        with Locations(Location((5, -2, 0), (0, 0, 270))):
            Circle(SKETCH51_R)
    extrude(amount=-ADD_L_SCREW_HOLE_DEPTH, mode=Mode.SUBTRACT)


solid = part.part
